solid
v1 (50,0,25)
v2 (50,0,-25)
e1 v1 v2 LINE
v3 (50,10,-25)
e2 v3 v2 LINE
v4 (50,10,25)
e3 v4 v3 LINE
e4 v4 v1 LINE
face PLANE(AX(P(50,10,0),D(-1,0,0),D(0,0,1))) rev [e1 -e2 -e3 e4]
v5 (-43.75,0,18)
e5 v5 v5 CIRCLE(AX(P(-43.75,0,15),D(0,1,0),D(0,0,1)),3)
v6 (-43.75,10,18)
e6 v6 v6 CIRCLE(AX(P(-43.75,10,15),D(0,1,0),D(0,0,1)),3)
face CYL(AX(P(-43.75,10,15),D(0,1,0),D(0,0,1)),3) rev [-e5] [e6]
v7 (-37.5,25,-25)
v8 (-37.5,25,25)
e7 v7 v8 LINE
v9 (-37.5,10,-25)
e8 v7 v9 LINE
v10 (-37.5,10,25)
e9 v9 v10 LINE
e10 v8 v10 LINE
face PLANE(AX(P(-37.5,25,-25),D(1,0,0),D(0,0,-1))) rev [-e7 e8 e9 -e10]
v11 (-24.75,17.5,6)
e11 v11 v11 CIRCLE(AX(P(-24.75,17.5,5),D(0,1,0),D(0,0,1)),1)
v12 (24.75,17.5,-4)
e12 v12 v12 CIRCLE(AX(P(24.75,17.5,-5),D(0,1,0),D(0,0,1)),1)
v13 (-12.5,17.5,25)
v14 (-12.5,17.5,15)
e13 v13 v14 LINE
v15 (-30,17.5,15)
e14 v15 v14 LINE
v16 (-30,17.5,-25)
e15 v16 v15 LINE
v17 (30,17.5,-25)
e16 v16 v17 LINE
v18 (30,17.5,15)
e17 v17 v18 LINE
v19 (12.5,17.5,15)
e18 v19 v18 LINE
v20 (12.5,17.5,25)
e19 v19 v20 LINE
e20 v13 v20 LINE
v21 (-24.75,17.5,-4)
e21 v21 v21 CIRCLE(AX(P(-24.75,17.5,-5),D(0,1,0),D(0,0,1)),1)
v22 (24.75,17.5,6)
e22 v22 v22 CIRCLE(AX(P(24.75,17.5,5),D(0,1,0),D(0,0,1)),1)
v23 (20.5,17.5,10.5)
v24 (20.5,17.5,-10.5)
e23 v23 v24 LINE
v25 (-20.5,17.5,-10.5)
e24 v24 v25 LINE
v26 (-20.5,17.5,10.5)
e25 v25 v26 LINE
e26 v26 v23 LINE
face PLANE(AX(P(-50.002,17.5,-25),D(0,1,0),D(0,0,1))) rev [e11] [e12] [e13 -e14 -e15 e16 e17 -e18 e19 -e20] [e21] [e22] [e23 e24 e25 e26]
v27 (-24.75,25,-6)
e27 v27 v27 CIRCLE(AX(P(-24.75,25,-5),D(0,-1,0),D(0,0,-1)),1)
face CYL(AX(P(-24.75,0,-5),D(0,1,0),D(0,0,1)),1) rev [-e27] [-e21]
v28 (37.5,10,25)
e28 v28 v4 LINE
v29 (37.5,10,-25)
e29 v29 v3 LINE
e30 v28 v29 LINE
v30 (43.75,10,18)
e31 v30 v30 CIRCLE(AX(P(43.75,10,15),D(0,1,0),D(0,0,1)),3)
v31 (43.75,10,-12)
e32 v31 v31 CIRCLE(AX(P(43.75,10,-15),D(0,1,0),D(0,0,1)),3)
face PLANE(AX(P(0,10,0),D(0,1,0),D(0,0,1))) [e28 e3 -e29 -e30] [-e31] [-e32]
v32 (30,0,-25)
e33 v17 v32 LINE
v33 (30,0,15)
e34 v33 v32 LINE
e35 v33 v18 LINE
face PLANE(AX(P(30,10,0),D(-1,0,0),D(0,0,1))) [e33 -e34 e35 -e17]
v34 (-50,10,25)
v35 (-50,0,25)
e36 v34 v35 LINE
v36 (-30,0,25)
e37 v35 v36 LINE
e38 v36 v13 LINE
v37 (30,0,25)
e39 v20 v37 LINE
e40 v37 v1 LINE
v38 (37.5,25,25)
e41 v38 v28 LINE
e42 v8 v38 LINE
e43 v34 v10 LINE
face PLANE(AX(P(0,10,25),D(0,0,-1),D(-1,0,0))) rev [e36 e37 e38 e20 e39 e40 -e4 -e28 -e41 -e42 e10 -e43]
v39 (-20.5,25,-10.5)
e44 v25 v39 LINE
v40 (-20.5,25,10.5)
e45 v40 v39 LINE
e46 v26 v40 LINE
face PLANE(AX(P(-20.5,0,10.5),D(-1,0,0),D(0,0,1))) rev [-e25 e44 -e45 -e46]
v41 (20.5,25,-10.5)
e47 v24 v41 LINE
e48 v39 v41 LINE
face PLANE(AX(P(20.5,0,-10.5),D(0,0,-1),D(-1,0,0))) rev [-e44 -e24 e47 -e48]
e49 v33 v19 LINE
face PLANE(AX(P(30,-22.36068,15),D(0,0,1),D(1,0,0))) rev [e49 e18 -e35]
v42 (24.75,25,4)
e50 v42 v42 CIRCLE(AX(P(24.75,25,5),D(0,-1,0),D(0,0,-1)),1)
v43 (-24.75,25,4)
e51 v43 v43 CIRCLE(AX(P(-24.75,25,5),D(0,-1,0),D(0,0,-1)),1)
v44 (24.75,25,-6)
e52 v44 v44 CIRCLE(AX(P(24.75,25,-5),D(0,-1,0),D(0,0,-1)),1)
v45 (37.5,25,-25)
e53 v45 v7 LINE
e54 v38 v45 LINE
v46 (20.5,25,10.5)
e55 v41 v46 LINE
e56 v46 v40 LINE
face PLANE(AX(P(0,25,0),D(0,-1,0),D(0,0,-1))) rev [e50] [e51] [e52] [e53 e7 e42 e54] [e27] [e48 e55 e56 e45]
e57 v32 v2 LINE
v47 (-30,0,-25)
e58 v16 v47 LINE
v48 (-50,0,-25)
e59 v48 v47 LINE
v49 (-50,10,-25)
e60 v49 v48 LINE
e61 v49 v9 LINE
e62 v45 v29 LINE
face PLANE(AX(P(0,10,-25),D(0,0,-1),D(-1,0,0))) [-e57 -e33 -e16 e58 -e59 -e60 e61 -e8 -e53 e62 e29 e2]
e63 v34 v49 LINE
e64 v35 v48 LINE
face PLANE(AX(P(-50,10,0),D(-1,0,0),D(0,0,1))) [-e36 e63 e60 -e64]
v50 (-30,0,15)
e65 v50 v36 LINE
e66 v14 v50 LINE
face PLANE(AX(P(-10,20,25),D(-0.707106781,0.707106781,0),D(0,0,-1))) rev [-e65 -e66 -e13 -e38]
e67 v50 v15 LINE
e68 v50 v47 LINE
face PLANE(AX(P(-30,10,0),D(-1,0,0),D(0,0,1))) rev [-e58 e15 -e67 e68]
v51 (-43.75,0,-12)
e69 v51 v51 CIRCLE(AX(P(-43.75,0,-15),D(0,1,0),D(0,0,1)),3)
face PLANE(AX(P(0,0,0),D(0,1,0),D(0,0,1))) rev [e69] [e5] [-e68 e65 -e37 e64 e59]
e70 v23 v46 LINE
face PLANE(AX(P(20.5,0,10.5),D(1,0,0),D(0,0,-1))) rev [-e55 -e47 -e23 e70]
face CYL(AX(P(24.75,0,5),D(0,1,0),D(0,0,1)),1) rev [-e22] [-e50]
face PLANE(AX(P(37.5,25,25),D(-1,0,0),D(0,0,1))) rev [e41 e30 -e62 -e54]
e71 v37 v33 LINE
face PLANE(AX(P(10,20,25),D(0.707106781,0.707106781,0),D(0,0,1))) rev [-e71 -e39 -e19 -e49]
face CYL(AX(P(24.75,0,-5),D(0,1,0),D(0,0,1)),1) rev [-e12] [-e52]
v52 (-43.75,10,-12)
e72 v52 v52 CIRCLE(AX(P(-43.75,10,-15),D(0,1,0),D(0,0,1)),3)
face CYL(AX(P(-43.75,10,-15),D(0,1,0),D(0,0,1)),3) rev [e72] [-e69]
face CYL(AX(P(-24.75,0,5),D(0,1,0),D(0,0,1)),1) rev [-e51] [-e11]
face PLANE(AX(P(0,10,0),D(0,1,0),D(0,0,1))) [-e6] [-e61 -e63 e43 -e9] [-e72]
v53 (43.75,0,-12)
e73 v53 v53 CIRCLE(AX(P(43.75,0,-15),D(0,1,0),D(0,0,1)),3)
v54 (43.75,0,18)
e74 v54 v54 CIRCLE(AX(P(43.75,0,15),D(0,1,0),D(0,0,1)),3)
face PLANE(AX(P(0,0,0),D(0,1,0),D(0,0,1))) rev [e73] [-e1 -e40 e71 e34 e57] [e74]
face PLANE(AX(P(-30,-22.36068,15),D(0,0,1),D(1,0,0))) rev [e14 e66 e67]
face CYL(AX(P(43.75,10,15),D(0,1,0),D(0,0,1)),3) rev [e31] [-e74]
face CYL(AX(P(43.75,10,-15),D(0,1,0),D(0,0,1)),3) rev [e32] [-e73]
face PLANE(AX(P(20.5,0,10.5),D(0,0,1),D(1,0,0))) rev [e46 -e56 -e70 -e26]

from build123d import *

# Parameters (mm, degrees)
SKETCH2_W                = 20
SKETCH2_H                = 50
BOSS_EXTRUDE2_DEPTH      = 10
BOSS_EXTRUDE2_2_DEPTH    = 10
SKETCH3_W                = 7.5
SKETCH3_H                = 50
BOSS_EXTRUDE3_DEPTH      = 15
BOSS_EXTRUDE4_REACH      = 89.464
SKETCH4_W                = 50
SKETCH4_H                = 7.5
CUT_EXTRUDE1_DEPTH       = 62.23724357
CUT_EXTRUDE1_DEPTH_BACK  = 62.23724357
SKETCH6_R                = 1
SKETCH6_W                = 41
SKETCH6_H                = 21
F_6_0_6_DIAMETER_HOLE1_D = 6
SKETCH10_W               = 20
SKETCH10_H               = 10
BOSS_EXTRUDE5_DEPTH      = 17.5
CHAMFER1_SIZE            = 20


with BuildPart() as part:
    # Sketch2 → Boss-Extrude2 (new body)
    with BuildSketch(Plane(origin=(0, 0, 0), x_dir=(1, 0, 0), z_dir=(0, 1, 0))):
        with Locations((-40, 0)):
            Rectangle(SKETCH2_W, SKETCH2_H)
    extrude(amount=BOSS_EXTRUDE2_DEPTH)



with BuildPart() as body_2:
    # Sketch2 → Boss-Extrude2 2 (new body)
    with BuildSketch(Plane(origin=(0, 0, 0), x_dir=(1, 0, 0), z_dir=(0, 1, 0))):
        with Locations((40, 0)):
            Rectangle(SKETCH2_W, SKETCH2_H)
    extrude(amount=BOSS_EXTRUDE2_2_DEPTH)


with BuildPart() as part_1:
    add(part.part)

    add(body_2.part)  # Boss-Extrude3 merges body 2
    # Sketch3 → Boss-Extrude3 (add)
    with BuildSketch(Plane(origin=(0, 10, 0), x_dir=(1, 0, 0), z_dir=(0, 1, 0))):
        with Locations((-33.75, 0)):
            Rectangle(SKETCH3_W, SKETCH3_H)
        with Locations((33.75, 0)):
            Rectangle(SKETCH3_W, SKETCH3_H)
    extrude(amount=BOSS_EXTRUDE3_DEPTH)

    # Sketch4 → Boss-Extrude4 (add, up to next)
    with BuildSketch(Plane.ZY.offset(-30), mode=Mode.PRIVATE) as boss_extrude4_sk1:
        with Locations((0, 21.25)):
            Rectangle(SKETCH4_W, SKETCH4_H)
    boss_extrude4_tool1 = extrude(boss_extrude4_sk1.sketch, amount=BOSS_EXTRUDE4_REACH, mode=Mode.PRIVATE) - part_1.part
    add(boss_extrude4_tool1.solids().sort_by_distance((30, 21.25, 0))[0])

    # Sketch6 → Cut-Extrude1 (cut, two sides: drawn at the far end of the back side and taken through both)
    with BuildSketch(Plane(origin=(0, 25, 0), x_dir=(1, 0, 0), z_dir=(0, 1, 0)).offset(-CUT_EXTRUDE1_DEPTH_BACK)):
        with Locations(Location((24.75, 5, 0), (0, 0, 270))):
            Circle(SKETCH6_R)
        with Locations(Location((24.75, -5, 0), (0, 0, 270))):
            Circle(SKETCH6_R)
        with Locations(Location((-24.75, 5, 0), (0, 0, 270))):
            Circle(SKETCH6_R)
        with Locations(Location((-24.75, -5, 0), (0, 0, 270))):
            Circle(SKETCH6_R)
        Rectangle(SKETCH6_W, SKETCH6_H)
    extrude(amount=CUT_EXTRUDE1_DEPTH + CUT_EXTRUDE1_DEPTH_BACK, mode=Mode.SUBTRACT)

    # Ø6.0 (6) Diameter Hole1 (through all)
    with Locations(Plane(origin=(-43.75, 10, -15), x_dir=(0, 0, 1), z_dir=(0, 1, 0))):
        with Locations((0, 0), (30, 0), (30, 87.5), (0, 87.5)):
            Hole(F_6_0_6_DIAMETER_HOLE1_D / 2)

    # Sketch10 → Boss-Extrude5 (add)
    with BuildSketch(Plane.XZ.offset(-17.5)):
        with Locations((-20, 20)):
            Rectangle(SKETCH10_W, SKETCH10_H)
        with Locations((20, 20)):
            Rectangle(SKETCH10_W, SKETCH10_H)
    extrude(amount=BOSS_EXTRUDE5_DEPTH)

    # Chamfer1
    # the kernel refuses this chamfer: 20 mm, written as the material it adds along each edge
    # the kernel refuses this chamfer: 20 mm, written as the material it takes off along each edge
    with BuildSketch(Plane(origin=(10, 0, 76.433659759), x_dir=(0.9996219169112968, -0.027495876610586372, 0), z_dir=(0, 0, -1))) as chamfer1_2_piece_1_section:
        Polygon((CHAMFER1_SIZE * 0.999621916911, -CHAMFER1_SIZE * 0.0274958766106), (-CHAMFER1_SIZE * 0.0274958766106, -CHAMFER1_SIZE * 0.999621916911), (0, 0), align=None)
    chamfer1_2_piece_1 = extrude(amount=112.867319519, mode=Mode.PRIVATE)
    chamfer1_2_piece_1 = split(chamfer1_2_piece_1, bisect_by=Plane(origin=(16.759259259, 17.5, 20), z_dir=(0, -1, 0)), keep=Keep.TOP, mode=Mode.PRIVATE)
    add(chamfer1_2_piece_1, mode=Mode.SUBTRACT)
    with BuildSketch(Plane(origin=(-10, 0, 76.433659759), x_dir=(0.027495876610586403, 0.9996219169112968, 0), z_dir=(0, 0, -1))) as chamfer1_2_piece_2_section:
        Polygon((CHAMFER1_SIZE * 0.999621916911, -CHAMFER1_SIZE * 0.0274958766106), (-CHAMFER1_SIZE * 0.0274958766106, -CHAMFER1_SIZE * 0.999621916911), (0, 0), align=None)
    chamfer1_2_piece_2 = extrude(amount=112.867319519, mode=Mode.PRIVATE)
    chamfer1_2_piece_2 = split(chamfer1_2_piece_2, bisect_by=Plane(origin=(-16.759259259, 17.5, 20), z_dir=(0, -1, 0)), keep=Keep.TOP, mode=Mode.PRIVATE)
    add(chamfer1_2_piece_2, mode=Mode.SUBTRACT)


solid = part_1.part
